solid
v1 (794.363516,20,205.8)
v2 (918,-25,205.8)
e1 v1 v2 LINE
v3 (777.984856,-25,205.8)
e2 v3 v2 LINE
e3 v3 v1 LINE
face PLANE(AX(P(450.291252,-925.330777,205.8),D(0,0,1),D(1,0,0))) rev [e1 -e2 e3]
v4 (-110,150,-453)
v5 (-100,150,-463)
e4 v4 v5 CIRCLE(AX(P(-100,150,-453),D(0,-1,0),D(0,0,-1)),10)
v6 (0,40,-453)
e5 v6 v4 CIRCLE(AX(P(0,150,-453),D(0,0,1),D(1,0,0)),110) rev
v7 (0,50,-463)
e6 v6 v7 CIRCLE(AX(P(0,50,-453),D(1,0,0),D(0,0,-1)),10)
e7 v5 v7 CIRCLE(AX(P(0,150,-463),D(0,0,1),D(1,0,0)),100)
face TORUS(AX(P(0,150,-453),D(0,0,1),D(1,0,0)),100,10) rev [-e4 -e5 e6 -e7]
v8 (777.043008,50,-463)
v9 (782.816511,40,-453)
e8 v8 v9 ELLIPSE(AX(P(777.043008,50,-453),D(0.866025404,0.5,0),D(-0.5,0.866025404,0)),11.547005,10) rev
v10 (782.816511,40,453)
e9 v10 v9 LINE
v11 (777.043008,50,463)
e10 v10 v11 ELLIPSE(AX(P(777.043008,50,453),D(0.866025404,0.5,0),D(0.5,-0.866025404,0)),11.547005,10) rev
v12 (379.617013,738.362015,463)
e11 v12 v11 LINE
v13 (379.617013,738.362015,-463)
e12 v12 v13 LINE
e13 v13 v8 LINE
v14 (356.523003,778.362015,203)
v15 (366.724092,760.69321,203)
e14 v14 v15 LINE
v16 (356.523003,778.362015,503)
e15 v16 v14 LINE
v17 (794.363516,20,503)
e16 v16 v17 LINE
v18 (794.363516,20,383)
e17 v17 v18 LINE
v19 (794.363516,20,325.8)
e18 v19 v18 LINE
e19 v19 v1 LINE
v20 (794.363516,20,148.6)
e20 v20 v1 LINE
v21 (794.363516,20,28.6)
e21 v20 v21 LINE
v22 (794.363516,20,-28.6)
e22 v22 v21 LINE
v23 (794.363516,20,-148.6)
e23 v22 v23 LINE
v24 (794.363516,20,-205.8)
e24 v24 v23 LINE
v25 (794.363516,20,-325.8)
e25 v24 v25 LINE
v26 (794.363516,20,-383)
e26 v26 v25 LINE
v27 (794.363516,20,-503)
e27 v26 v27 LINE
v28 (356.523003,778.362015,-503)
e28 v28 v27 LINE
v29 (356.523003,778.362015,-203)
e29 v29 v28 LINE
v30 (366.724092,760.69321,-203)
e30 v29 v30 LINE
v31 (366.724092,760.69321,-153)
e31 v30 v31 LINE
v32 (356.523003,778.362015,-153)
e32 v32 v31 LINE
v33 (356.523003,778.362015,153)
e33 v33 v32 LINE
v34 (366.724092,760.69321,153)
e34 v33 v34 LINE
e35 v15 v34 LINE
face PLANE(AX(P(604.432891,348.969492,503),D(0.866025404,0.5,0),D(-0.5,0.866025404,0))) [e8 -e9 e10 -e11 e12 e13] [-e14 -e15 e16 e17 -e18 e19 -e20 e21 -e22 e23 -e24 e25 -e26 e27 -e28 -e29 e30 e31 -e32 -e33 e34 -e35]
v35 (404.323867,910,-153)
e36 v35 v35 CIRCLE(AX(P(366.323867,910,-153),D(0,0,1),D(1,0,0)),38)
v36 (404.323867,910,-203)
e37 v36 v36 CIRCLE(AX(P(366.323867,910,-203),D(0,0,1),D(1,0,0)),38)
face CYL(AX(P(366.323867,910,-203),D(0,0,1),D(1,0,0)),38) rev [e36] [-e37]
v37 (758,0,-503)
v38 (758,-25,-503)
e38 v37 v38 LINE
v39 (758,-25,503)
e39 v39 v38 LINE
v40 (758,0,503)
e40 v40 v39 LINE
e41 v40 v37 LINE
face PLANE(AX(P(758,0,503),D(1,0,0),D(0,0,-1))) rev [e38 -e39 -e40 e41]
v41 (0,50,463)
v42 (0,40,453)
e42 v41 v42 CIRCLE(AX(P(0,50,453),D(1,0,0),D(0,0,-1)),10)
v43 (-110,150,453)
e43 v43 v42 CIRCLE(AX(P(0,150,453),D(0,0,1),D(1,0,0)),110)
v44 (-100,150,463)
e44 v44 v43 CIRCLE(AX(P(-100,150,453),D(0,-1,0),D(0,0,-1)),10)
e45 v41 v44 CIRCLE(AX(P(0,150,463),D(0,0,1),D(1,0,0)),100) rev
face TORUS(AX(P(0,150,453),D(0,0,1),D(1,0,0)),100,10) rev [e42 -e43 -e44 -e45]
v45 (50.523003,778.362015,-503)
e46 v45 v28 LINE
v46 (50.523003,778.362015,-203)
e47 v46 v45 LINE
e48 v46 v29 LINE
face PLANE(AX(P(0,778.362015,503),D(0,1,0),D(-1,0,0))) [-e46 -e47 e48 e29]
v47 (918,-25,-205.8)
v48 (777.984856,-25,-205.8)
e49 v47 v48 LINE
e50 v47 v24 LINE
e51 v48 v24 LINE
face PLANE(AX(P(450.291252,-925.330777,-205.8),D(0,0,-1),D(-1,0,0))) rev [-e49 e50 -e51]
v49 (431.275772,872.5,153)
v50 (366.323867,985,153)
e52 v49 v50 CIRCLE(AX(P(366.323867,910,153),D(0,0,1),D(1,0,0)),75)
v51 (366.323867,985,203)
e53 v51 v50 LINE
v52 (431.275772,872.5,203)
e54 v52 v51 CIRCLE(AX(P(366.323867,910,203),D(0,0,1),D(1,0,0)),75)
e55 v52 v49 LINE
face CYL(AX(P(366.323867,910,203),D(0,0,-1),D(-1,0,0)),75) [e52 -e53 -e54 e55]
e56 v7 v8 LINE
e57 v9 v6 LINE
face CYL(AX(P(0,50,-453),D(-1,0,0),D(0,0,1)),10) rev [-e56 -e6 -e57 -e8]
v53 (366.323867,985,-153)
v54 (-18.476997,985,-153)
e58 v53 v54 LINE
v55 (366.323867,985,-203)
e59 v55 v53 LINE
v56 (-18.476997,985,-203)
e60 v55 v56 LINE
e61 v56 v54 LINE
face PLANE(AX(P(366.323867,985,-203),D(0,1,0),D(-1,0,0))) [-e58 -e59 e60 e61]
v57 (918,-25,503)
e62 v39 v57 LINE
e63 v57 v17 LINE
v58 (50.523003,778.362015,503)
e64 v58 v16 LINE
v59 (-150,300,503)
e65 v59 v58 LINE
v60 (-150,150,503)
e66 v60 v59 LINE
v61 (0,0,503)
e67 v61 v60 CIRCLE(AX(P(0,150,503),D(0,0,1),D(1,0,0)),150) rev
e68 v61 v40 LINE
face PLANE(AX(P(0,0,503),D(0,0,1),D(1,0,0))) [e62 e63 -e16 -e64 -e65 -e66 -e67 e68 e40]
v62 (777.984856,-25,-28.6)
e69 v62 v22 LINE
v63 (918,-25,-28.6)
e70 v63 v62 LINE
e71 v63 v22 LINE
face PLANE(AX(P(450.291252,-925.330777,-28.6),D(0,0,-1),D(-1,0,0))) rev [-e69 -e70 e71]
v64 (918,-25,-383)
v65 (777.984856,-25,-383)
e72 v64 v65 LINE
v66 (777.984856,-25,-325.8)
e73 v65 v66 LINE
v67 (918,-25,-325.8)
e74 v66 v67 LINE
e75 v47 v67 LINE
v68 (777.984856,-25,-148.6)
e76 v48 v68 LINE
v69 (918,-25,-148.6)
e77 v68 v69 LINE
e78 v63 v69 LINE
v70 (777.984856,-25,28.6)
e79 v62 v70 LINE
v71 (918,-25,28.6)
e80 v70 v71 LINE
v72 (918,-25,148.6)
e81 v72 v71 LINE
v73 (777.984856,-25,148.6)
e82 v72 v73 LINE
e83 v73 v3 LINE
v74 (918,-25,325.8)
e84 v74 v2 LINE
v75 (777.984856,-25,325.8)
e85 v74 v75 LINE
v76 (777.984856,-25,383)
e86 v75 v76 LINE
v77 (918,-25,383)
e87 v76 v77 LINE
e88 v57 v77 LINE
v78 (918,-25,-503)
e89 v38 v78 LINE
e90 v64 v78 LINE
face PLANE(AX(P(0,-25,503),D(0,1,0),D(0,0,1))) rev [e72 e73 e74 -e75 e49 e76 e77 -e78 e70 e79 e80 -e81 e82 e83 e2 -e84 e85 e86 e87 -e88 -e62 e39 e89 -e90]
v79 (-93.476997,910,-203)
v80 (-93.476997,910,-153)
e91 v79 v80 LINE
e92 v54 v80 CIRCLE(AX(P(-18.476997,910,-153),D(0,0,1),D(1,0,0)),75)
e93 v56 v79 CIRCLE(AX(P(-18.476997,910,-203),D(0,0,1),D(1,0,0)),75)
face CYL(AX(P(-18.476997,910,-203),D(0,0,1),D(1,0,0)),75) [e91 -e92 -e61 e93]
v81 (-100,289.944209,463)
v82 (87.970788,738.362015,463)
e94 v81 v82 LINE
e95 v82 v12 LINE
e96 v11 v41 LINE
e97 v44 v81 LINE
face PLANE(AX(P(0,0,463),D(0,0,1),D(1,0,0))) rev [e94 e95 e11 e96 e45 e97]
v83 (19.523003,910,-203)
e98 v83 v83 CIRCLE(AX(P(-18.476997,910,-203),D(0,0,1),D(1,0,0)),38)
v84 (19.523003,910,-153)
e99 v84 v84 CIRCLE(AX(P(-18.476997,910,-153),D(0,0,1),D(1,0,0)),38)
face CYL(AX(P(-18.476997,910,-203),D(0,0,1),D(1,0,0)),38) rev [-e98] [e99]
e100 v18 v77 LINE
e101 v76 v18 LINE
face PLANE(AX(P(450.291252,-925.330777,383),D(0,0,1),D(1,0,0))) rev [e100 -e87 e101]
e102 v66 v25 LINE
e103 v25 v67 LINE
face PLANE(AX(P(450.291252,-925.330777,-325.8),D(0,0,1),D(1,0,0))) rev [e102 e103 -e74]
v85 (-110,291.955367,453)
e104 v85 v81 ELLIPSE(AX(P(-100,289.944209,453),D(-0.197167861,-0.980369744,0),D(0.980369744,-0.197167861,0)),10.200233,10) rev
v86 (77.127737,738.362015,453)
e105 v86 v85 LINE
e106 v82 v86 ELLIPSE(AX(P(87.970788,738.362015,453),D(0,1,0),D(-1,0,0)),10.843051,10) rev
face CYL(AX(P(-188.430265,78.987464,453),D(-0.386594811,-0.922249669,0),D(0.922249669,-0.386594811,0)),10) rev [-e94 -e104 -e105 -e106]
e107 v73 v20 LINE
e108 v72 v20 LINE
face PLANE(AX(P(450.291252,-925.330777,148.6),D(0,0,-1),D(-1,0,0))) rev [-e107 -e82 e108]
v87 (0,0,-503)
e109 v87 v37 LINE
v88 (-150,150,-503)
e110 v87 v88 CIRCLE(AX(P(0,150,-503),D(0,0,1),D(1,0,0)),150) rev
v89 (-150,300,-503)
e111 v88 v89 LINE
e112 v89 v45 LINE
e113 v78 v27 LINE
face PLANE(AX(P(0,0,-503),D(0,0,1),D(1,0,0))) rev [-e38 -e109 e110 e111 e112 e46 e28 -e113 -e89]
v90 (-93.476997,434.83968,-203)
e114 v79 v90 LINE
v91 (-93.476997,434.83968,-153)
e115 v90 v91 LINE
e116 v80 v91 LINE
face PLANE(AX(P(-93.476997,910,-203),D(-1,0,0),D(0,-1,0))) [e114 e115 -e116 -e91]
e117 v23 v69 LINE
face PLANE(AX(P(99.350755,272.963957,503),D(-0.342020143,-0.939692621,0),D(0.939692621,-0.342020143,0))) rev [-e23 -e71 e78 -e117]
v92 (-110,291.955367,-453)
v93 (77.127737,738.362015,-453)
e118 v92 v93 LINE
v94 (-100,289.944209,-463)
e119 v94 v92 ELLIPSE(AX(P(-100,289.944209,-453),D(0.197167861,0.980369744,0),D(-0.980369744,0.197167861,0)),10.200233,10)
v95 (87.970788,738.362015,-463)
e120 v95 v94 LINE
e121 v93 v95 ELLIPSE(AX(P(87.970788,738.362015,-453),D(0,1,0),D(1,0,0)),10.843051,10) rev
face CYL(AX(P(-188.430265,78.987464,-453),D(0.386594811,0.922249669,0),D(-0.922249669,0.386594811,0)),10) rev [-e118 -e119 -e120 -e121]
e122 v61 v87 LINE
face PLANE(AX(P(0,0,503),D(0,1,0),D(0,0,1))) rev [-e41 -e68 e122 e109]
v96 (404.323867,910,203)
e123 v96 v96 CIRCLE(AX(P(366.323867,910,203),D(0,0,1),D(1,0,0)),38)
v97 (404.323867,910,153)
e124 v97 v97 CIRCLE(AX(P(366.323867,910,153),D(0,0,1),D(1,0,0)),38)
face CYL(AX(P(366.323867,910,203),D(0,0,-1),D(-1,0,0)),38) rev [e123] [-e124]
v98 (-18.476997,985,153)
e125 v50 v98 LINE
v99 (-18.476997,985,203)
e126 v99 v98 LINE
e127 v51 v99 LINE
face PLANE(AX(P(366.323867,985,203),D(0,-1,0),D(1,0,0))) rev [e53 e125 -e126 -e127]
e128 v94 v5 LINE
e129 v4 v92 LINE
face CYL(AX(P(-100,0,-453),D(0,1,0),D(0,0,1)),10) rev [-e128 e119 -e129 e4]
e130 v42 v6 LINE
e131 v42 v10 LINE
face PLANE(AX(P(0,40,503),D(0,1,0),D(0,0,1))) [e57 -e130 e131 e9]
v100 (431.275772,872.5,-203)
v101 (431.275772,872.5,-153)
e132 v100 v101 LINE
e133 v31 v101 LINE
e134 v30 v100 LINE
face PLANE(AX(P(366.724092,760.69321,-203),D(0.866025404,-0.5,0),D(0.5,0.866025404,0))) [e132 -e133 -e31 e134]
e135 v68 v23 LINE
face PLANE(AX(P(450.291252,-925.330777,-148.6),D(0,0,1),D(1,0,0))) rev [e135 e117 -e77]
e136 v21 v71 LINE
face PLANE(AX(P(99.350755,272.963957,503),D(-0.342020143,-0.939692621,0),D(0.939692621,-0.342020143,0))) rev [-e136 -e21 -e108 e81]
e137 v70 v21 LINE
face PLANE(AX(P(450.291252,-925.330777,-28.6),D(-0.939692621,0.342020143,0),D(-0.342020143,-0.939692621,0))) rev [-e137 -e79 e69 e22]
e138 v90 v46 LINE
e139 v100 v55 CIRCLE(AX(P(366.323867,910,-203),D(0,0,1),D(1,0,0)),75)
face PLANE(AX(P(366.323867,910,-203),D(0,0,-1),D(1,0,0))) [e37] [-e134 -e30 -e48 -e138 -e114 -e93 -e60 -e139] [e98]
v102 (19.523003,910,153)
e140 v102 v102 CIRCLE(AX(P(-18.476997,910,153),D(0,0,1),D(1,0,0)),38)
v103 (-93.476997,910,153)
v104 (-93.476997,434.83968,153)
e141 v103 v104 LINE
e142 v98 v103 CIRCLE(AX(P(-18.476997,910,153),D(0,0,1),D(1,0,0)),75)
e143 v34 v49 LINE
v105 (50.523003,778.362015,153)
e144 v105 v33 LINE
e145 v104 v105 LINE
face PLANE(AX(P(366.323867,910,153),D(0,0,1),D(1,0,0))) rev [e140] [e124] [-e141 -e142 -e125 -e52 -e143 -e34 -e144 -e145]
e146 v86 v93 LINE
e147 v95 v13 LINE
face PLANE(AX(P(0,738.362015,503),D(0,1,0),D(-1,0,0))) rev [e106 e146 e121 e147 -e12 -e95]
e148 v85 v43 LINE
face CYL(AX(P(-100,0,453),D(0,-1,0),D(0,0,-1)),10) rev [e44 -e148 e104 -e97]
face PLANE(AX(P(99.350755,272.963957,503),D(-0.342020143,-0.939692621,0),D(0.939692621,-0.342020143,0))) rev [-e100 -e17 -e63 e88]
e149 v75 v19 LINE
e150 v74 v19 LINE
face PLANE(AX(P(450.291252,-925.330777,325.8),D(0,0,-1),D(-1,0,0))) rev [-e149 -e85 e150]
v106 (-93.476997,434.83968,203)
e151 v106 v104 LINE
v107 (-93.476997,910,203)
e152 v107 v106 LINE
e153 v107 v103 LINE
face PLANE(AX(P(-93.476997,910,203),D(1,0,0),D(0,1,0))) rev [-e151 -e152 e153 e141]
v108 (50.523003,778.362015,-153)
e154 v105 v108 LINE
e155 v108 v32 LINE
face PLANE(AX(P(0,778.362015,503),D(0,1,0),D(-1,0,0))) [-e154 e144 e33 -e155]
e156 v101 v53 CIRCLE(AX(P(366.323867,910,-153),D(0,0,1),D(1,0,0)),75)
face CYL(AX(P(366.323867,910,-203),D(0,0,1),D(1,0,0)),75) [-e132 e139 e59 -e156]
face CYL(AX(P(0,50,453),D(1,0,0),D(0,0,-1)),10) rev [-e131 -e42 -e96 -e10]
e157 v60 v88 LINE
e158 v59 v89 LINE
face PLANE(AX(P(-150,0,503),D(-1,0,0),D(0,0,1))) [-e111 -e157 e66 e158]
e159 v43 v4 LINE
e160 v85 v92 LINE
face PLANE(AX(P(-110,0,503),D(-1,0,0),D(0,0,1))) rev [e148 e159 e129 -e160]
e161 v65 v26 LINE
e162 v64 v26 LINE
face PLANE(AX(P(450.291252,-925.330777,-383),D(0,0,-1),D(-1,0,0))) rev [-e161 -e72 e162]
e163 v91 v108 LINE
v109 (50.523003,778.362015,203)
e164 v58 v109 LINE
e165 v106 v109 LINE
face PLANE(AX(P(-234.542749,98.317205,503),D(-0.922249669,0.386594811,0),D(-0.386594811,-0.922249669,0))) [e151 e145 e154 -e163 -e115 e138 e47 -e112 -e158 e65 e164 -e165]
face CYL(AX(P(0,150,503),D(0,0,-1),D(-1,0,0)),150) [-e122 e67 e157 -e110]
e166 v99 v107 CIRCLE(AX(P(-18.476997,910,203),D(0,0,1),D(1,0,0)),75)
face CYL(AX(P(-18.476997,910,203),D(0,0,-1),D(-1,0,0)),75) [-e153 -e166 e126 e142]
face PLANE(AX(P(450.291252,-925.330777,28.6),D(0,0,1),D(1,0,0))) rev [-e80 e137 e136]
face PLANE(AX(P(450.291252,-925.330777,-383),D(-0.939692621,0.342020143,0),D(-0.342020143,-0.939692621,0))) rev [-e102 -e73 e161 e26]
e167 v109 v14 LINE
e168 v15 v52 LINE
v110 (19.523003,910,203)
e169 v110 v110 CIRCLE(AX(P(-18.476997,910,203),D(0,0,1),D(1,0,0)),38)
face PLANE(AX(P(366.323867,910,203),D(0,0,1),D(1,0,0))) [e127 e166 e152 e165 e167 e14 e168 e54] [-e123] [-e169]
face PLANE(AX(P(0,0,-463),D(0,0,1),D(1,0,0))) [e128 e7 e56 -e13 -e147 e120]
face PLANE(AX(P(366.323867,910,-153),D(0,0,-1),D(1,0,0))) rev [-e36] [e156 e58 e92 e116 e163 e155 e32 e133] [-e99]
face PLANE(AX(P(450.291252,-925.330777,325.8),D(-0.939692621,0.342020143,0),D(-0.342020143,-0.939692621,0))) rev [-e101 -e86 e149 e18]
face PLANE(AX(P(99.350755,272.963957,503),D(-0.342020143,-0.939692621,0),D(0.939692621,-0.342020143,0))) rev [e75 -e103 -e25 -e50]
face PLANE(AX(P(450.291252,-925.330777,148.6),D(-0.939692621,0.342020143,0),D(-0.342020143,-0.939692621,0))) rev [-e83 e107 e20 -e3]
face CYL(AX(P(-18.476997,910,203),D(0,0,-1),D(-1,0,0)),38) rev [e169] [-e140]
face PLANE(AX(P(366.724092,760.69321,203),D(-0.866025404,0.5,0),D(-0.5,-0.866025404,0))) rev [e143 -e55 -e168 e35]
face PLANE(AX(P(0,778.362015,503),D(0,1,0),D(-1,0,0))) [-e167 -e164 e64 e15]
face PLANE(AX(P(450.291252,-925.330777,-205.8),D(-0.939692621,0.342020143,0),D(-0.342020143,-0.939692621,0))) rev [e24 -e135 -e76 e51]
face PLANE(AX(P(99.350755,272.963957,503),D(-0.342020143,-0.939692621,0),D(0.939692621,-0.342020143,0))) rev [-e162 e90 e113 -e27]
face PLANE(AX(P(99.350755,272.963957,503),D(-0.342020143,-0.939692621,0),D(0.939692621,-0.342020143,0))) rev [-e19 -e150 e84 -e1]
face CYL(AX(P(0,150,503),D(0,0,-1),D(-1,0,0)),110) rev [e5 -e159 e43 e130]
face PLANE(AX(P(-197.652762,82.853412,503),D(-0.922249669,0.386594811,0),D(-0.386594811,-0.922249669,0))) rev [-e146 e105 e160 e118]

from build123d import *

# Parameters (mm, degrees)
BOSS_EXTRUDE2_DEPTH = 503
SHELL1_START        = -463
SHELL1_DEPTH        = 926
FILLET1_R           = 10
SKETCH8_W           = 131.571198008
SKETCH8_H           = 57.2
CUT_EXTRUDE5_DEPTH  = 1006
LPATTERN1_COUNT     = 5
LPATTERN1_PITCH     = 177.2
BOSS_EXTRUDE4_START = -350
SKETCH12_R          = 38
BOSS_EXTRUDE4_DEPTH = 50


# Read off the part's stored shape, not the designer's step: Shell1
with BuildPart() as part:
    # Sketch1 → Boss-Extrude2 (new, symmetric)
    with BuildSketch(Plane.XY):
        with BuildLine():
            ThreePointArc((-150, 150), (-106.066017178, 43.933982822), (0, 0))
            Line((0, 0), (758, 0))
            Line((758, 0), (758, -25))
            Line((758, -25), (777.984855583, -25))
            Line((777.984855583, -25), (794.363516125, 20))
            Line((794.363516125, 20), (356.523002694, 778.362014874))
            Line((356.523002694, 778.362014874), (50.523002694, 778.362014874))
            Line((50.523002694, 778.362014874), (-150, 300))
            Line((-150, 300), (-150, 150))
        make_face()
        Polygon((794.363516125, 20), (777.984855583, -25), (918, -25), align=None)
    extrude(amount=BOSS_EXTRUDE2_DEPTH, both=True)

    # Shell1 outline → Shell1 (cut)
    with BuildSketch(Plane.XY.offset(SHELL1_START)):
        with BuildLine():
            ThreePointArc((-110, 150), (-77.781745931, 72.218254069), (0, 40))
            Line((0, 40), (782.816510741, 40))
            Line((782.816510741, 40), (379.617013461, 738.362014874))
            Line((379.617013461, 738.362014874), (77.127737155, 738.362014874))
            Line((77.127737155, 738.362014874), (-110, 291.955367349))
            Line((-110, 291.955367349), (-110, 150))
        make_face()
    extrude(amount=SHELL1_DEPTH, mode=Mode.SUBTRACT)

    # Fillet1
    fillet1_edges = [part.edges().sort_by_distance(p)[0] for p in [
        (-77.781745931, 72.218254069, 463),
        (391.408255371, 40, -463),
        (-16.436131422, 515.158691112, 463),
        (-110, 220.977683675, 463),
        (391.408255371, 40, 463),
        (-77.781745931, 72.218254069, -463),
        (-110, 220.977683675, -463),
        (-16.436131422, 515.158691112, -463),
    ]]
    fillet(fillet1_edges, radius=FILLET1_R)

    # Sketch8 → Cut-Extrude5 (cut)
    with BuildSketch(Plane(origin=(99.350755487, 272.963957307, 0), x_dir=(0.9396926207859106, -0.3420201433256628, 0), z_dir=(0.34202014332566283, 0.9396926207859106, 0))):
        with Locations((805.402730461, 354.4)):
            Rectangle(SKETCH8_W, SKETCH8_H)
    cut_extrude5 = extrude(amount=-CUT_EXTRUDE5_DEPTH, mode=Mode.SUBTRACT)

    # LPattern1: Cut-Extrude5 ×5
    with Locations(*[(0, 0, i * LPATTERN1_PITCH) for i in range(1, LPATTERN1_COUNT)]):
        add(cut_extrude5, mode=Mode.SUBTRACT)

    # Sketch12 → Boss-Extrude4 (add)
    with BuildSketch(Plane.XY.offset(503).offset(BOSS_EXTRUDE4_START)):
        with BuildLine():
            Line((366.724091876, 760.693210118), (431.275772112, 872.5))
            ThreePointArc((431.275772112, 872.5), (431.275772112, 947.5), (366.323866828, 985))
            Line((366.323866828, 985), (-18.476997306, 985))
            ThreePointArc((-18.476997306, 985), (-71.510005895, 963.033008589), (-93.476997306, 910))
            Line((-93.476997306, 910), (-93.476997306, 434.839679698))
            Line((-93.476997306, 434.839679698), (50.523002694, 778.362014874))
            Line((50.523002694, 778.362014874), (356.523002694, 778.362014874))
            Line((356.523002694, 778.362014874), (366.724091876, 760.693210118))
        make_face()
        with Locations((-18.476997306, 910)):
            Circle(SKETCH12_R, mode=Mode.SUBTRACT)
        with Locations((366.323866828, 910)):
            Circle(SKETCH12_R, mode=Mode.SUBTRACT)
    boss_extrude4 = extrude(amount=BOSS_EXTRUDE4_DEPTH)

    # Mirror2: Boss-Extrude4 across plane
    add(boss_extrude4.mirror(Plane.XY))


solid = part.part
